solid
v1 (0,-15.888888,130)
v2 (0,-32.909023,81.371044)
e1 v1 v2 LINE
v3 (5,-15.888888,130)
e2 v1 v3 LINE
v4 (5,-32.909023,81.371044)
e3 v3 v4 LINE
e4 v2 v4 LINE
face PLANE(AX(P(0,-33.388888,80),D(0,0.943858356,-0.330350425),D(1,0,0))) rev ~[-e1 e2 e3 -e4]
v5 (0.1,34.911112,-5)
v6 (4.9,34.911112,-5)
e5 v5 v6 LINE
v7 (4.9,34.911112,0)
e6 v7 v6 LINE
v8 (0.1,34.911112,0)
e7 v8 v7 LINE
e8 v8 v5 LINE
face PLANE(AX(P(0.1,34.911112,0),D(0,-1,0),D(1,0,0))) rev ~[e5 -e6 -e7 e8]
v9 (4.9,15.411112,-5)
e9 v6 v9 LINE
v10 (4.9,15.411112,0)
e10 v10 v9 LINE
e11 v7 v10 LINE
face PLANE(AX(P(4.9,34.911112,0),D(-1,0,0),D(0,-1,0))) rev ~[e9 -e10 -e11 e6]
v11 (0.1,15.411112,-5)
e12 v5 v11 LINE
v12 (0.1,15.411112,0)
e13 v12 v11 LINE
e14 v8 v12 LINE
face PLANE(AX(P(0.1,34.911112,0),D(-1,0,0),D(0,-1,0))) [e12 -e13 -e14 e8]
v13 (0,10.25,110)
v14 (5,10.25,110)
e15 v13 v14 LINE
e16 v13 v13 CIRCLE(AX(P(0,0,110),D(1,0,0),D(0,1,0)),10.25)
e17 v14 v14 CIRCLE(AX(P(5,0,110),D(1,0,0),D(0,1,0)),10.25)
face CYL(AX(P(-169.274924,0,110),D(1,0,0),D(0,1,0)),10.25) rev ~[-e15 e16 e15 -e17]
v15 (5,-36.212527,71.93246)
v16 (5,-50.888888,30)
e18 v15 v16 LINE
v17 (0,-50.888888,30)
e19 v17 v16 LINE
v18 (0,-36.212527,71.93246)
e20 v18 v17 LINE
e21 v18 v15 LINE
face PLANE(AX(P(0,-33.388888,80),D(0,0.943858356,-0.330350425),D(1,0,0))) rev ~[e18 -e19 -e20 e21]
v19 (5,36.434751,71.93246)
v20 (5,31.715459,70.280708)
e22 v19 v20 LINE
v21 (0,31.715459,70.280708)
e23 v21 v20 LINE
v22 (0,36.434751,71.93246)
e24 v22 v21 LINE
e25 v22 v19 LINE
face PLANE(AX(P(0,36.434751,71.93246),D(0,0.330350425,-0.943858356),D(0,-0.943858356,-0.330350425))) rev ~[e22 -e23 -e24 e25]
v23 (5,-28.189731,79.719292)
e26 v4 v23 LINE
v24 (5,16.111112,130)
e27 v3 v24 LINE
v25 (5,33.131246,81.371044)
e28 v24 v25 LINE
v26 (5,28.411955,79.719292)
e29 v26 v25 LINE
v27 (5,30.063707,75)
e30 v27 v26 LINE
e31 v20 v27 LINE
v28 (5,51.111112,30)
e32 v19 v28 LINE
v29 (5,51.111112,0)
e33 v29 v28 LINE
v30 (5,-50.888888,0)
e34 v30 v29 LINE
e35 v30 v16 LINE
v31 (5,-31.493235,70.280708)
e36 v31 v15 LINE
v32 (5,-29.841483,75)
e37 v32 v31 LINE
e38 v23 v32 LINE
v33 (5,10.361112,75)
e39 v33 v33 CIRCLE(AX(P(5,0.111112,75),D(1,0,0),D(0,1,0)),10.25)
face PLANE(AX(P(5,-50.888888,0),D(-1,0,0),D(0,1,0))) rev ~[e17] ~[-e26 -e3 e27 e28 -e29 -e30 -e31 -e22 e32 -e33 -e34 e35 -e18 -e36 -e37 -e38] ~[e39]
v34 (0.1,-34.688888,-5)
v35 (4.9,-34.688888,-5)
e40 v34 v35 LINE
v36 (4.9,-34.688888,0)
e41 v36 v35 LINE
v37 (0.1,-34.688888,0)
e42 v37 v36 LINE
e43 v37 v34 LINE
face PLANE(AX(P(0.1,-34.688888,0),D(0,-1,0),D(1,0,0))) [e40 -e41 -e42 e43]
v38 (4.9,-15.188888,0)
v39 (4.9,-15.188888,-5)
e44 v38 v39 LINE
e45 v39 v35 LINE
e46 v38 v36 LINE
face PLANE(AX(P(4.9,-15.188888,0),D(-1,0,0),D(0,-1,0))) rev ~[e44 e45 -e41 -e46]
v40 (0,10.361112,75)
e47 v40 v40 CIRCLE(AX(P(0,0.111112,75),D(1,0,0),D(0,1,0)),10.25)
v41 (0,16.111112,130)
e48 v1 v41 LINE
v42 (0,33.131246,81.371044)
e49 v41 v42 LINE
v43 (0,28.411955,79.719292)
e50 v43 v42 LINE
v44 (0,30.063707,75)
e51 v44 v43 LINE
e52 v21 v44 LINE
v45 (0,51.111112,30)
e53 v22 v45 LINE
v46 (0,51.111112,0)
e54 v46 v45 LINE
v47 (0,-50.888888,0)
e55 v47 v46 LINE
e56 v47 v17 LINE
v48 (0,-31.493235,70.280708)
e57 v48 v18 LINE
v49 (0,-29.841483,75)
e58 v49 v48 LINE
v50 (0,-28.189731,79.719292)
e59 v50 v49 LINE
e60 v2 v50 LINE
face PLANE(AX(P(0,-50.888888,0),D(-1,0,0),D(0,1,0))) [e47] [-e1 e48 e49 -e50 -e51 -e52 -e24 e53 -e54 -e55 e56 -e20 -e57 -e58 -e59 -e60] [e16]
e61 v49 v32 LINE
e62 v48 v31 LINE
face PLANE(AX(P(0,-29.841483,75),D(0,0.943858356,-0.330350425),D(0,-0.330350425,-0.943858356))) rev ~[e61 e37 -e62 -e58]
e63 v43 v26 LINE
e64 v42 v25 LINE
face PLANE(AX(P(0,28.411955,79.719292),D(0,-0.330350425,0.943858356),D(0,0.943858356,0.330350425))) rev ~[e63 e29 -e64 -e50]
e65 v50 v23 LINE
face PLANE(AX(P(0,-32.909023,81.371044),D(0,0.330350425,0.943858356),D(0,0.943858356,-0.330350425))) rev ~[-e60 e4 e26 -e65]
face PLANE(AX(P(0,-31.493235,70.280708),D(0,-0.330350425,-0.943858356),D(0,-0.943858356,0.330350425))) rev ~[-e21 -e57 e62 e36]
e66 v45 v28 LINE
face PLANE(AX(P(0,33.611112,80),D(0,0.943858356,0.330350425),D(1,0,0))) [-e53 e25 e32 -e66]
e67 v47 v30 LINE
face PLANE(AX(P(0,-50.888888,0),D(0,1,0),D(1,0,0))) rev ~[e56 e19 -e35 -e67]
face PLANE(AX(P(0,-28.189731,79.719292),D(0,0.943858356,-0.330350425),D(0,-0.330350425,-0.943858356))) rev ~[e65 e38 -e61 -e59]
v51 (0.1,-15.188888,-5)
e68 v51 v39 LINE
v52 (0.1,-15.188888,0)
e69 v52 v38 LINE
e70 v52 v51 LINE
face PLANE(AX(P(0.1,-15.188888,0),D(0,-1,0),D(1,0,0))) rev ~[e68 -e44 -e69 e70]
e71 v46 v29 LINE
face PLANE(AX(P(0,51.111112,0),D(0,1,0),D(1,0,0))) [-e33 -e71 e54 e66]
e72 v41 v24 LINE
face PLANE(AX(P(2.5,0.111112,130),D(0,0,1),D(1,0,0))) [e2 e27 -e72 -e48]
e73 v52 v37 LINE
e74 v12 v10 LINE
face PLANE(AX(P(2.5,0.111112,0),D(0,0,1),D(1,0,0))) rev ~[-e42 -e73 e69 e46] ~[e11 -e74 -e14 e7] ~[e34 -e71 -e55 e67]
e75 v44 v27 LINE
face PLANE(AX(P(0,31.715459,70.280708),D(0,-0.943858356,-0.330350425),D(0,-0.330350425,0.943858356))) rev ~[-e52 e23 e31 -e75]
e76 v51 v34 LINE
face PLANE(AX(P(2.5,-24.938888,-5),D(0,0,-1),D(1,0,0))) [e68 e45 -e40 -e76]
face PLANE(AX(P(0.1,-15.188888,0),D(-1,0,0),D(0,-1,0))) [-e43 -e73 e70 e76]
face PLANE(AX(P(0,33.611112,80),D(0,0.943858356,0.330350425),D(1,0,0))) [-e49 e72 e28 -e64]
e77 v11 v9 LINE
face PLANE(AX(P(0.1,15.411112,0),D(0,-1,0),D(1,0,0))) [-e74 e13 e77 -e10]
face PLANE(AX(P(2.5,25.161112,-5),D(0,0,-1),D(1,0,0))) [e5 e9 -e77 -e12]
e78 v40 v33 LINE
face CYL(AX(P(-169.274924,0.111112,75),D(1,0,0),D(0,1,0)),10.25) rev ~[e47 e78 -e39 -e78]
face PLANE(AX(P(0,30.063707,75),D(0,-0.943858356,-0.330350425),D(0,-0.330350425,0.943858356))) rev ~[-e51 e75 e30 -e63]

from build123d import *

# Parameters (mm, degrees)
F0_W     = 5
F0_H     = 102
F1_DEPTH = 130
F2_SIZE2 = 100
F2_SIZE  = 35
F4_W     = 4.8
F4_H     = 19.5
F5_DEPTH = 5
F6_D     = 20.5
F7_D     = 20.5
F8_DEPTH = 25


# Not quite as in the source:
# - a feature names something its author has since deleted; it is built from what else it names


with BuildPart() as f1:
    # F0 (on Top) → F1 (new body)
    with BuildSketch(Plane.XY):
        with Locations((2.5, 0.1111116846)):
            Rectangle(F0_W, F0_H)
    extrude(amount=F1_DEPTH)

    # F2
    f2_edges = [f1.edges().sort_by_distance(p)[0] for p in [
        (2.5, -50.888888, 130),
        (2.5, 51.111112, 130),
    ]]
    f2_side = f1.faces().sort_by_distance((2.5, 0.111112, 130))[0]
    chamfer(f2_edges, length=F2_SIZE, length2=F2_SIZE2, reference=f2_side)

    # F4 (on face) → F5 (join)
    with BuildSketch(Plane(origin=(0, 0, 0), x_dir=(1, 0, 0), z_dir=(0, 0, -1))):
        with Locations((2.5, -25.1611116846)):
            Rectangle(F4_W, F4_H)
        with Locations((2.5, 24.9388883154)):
            Rectangle(F4_W, F4_H)
    extrude(amount=F5_DEPTH)

    # F6 (through all)
    with Locations(Plane(origin=(0, 0, 0), x_dir=(0, -1, 0), z_dir=(-1, 0, 0))):
        with Locations((-0.1111116846, 75)):
            Hole(F6_D / 2)

    # F7 (through all)
    with Locations(Plane(origin=(0, 0, 0), x_dir=(0, -1, 0), z_dir=(-1, 0, 0))):
        with Locations((0, 110)):
            Hole(F7_D / 2)

    # F3 (on face) → F8 (cut)
    with BuildSketch(Plane(origin=(0, 0, 0), x_dir=(0, -1, 0), z_dir=(-1, 0, 0))):
        Polygon((-28.4119545359, 79.7192917818), (-33.1312463177, 81.3710439055), (-36.434750565, 71.9324603418), (-31.7154587832, 70.2807082182), (-30.0637066595, 75), align=None)
        Polygon((28.1897311666, 79.7192917818), (29.8414832903, 75), (34.5607750721, 76.6517521236), (32.9090229484, 81.3710439055), align=None)
        Polygon((34.5607750721, 76.6517521236), (29.8414832903, 75), (31.4932354139, 70.2807082182), (36.2125271957, 71.9324603418), align=None)
    extrude(amount=-F8_DEPTH, mode=Mode.SUBTRACT)


solid = f1.part
